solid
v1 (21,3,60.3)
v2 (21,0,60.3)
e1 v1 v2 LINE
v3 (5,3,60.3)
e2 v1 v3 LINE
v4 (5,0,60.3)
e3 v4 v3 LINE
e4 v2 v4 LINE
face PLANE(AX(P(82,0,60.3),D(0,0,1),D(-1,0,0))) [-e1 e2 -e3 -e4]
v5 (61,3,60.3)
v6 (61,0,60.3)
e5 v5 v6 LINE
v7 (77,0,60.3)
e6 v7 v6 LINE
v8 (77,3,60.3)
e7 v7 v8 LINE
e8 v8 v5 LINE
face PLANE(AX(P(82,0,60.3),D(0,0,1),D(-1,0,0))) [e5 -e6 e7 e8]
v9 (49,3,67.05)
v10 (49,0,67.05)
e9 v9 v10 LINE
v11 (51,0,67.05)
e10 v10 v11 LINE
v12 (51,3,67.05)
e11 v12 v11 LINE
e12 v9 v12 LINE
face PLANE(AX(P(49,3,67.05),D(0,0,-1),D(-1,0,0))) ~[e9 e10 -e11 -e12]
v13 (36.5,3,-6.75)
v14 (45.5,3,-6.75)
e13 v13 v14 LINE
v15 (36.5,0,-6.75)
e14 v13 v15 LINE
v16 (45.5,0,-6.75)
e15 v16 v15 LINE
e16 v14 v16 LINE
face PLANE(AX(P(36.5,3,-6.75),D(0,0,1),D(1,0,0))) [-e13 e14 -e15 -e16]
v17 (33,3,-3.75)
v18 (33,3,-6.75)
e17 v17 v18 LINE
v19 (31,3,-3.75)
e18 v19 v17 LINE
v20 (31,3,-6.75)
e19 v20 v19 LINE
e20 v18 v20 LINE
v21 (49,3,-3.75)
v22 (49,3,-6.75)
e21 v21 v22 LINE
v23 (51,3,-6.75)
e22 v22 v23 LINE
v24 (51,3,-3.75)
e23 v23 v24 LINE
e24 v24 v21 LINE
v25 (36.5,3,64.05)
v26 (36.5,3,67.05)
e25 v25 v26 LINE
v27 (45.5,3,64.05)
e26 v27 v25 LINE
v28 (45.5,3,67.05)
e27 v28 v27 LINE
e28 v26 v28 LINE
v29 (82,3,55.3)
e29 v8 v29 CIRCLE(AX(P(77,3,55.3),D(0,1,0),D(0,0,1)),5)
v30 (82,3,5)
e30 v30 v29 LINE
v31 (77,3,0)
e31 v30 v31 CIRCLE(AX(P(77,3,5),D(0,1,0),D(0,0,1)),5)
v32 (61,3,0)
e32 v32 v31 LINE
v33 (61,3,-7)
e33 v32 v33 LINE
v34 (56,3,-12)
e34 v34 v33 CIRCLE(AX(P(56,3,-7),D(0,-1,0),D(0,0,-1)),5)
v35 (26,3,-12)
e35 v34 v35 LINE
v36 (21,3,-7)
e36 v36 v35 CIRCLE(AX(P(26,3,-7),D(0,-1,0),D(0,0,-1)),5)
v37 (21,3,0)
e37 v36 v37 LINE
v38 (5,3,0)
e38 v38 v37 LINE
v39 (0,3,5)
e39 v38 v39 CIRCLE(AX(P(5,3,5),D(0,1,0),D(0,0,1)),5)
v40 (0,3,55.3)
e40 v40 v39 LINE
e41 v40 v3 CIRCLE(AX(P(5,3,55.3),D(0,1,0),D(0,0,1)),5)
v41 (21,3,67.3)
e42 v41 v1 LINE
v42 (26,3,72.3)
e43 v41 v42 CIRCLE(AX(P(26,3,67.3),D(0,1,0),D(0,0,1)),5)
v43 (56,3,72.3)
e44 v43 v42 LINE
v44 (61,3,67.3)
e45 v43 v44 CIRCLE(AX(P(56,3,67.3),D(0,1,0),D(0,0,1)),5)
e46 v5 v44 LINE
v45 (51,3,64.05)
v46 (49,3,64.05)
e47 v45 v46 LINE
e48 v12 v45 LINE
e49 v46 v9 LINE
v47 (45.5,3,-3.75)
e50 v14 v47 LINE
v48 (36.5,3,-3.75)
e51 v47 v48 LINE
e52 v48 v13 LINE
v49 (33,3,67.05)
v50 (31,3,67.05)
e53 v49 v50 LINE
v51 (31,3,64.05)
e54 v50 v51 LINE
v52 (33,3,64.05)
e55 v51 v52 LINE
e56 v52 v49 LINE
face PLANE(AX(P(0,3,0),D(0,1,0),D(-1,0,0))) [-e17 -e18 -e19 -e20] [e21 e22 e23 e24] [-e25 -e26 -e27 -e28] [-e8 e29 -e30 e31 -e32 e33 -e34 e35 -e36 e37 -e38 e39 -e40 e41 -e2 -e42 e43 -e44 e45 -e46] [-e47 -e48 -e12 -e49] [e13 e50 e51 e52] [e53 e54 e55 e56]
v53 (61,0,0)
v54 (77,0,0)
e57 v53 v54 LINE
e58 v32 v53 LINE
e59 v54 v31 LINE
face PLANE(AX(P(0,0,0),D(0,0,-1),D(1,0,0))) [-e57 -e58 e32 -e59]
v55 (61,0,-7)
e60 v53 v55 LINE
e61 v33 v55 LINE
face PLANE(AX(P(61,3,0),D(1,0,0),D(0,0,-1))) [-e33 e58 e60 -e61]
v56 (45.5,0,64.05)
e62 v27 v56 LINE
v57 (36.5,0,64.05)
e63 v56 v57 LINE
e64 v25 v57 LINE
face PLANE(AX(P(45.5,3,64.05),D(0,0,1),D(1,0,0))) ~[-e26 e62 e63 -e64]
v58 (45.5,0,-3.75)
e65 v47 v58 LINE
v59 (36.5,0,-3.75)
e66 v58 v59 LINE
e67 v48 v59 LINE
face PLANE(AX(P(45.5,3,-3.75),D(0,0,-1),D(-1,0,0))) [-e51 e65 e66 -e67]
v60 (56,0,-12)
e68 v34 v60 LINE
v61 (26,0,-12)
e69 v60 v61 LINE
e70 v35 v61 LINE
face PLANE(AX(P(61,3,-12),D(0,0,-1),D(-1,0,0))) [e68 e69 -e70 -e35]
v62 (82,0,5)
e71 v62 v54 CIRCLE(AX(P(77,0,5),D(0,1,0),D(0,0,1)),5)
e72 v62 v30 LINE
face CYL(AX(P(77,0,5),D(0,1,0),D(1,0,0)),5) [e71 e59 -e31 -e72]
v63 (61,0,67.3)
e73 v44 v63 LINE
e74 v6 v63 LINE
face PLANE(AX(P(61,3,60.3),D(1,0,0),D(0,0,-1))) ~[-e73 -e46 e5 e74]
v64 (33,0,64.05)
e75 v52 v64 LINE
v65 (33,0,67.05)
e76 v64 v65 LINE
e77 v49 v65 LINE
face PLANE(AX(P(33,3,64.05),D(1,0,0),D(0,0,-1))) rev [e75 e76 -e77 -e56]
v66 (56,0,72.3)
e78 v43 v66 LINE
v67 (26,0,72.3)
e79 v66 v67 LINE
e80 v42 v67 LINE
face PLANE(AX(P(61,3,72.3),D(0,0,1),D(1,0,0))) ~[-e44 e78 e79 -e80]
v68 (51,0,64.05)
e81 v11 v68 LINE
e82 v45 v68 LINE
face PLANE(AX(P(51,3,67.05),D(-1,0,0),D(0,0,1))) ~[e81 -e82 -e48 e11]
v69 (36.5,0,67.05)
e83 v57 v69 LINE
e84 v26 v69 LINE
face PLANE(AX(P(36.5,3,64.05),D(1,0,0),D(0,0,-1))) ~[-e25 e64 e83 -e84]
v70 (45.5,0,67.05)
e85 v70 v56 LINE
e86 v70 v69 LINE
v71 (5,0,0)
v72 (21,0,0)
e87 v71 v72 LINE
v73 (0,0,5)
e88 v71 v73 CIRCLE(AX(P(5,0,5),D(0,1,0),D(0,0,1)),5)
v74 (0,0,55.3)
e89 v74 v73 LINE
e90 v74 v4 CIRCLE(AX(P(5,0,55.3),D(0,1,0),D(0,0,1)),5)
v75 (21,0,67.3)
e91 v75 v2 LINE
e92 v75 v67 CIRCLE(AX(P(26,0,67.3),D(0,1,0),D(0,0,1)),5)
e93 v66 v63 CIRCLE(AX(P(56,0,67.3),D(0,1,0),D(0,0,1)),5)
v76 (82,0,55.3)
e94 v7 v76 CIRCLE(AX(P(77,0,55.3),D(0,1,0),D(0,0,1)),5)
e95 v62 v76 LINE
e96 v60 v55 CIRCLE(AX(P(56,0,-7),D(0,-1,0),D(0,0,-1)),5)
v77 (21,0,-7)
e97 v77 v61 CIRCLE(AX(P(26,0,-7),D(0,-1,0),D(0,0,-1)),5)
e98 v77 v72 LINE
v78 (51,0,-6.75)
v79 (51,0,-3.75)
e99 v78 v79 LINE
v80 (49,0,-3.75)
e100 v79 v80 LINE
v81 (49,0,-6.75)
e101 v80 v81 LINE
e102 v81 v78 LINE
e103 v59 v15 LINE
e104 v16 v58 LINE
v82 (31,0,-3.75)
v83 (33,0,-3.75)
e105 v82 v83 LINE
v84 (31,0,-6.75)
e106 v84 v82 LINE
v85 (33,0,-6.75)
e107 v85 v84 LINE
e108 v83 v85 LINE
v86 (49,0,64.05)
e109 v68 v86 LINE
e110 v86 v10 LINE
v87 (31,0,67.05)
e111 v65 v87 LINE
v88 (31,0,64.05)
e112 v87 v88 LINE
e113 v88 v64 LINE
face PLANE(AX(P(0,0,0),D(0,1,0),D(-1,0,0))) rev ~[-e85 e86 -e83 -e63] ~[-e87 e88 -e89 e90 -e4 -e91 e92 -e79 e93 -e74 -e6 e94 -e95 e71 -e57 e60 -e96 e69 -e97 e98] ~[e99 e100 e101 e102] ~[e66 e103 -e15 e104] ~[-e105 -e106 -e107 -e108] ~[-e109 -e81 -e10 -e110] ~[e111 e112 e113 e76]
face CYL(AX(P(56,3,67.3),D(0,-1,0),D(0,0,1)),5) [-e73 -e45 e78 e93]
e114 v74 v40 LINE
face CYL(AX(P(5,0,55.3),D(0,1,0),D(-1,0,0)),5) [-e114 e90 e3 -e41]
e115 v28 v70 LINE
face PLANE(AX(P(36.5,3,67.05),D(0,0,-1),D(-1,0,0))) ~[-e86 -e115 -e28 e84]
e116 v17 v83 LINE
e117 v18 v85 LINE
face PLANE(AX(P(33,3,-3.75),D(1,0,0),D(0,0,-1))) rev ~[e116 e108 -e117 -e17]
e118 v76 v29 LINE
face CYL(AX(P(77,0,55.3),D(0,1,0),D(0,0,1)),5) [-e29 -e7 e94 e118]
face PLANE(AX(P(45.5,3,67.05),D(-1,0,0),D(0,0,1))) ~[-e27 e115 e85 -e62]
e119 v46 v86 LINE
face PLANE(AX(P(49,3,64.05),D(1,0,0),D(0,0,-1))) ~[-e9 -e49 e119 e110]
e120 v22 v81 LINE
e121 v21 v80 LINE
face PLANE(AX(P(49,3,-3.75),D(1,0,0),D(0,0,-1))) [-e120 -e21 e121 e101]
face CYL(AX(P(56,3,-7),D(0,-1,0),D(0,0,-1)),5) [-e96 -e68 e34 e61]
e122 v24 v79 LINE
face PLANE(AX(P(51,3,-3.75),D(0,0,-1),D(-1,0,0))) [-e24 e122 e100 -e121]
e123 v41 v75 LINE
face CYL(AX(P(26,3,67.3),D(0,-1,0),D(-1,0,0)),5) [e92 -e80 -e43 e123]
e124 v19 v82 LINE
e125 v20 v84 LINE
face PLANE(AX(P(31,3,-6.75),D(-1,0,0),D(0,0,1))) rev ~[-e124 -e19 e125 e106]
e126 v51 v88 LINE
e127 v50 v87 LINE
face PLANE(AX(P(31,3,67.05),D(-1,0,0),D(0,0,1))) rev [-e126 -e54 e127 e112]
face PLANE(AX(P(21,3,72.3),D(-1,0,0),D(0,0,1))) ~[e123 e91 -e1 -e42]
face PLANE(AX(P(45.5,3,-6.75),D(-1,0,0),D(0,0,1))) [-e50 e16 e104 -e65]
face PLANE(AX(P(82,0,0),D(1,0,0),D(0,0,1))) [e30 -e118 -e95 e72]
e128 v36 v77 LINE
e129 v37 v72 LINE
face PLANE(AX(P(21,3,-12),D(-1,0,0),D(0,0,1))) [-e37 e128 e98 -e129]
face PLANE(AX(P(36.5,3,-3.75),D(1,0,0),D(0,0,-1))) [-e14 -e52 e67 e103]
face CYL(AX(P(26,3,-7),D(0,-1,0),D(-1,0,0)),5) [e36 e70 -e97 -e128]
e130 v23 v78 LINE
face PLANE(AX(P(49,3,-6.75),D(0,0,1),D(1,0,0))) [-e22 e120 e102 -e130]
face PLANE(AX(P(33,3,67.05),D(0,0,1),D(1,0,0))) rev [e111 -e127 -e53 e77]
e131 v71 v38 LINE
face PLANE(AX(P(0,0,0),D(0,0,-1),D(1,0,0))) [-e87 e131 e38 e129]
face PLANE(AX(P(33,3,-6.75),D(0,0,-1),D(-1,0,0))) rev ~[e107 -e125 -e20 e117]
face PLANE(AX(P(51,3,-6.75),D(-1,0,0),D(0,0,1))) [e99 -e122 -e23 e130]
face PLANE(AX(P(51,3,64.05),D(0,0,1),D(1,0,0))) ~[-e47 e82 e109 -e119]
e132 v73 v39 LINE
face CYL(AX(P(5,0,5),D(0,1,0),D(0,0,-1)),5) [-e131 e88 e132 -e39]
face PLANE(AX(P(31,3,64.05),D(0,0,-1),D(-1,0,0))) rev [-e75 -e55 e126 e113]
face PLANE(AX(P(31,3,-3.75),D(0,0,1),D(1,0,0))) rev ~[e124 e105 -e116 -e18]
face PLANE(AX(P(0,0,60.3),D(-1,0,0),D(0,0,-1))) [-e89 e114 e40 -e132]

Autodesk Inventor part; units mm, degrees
ref_plane "YZ Plane" through (0, 0, 0) normal (1, 0, 0) x (0, 1, 0)
ref_plane "XZ Plane" through (0, 0, 0) normal (0, 1, 0) x (-1, 0, 0)
sketch "Sketch1" plane through (0, 0, 0) normal (0, 1, 0) x (-1, 0, 0)
  line L0 (0, 0) -> (-82, 0)
  line L1 (-82, 0) -> (-82, 60.3)
  line L2 (-82, 60.3) -> (0, 60.3)
  line L3 (0, 60.3) -> (0, 0)
  dimension "d0" = 82
  dimension "d1" = 60.3
extrude "Extrusion1" add sketch "Sketch1" along normal blind 3
sketch "Sketch3" plane through (0, 3, 0) normal (0, 1, 0) x (1, 0, 0)
  line L0 (82, -60.3) -> (82, 0) projected
  line L1 (82, 0) -> (0, 0) projected
  line L2 (21, 0) -> (61, 0)
  line L3 (61, 0) -> (61, 12)
  line L4 (61, 12) -> (21, 12)
  line L5 (21, 12) -> (21, 0)
  dimension "d22" = 82
  dimension "d23" = 12
  dimension "d24" = 21
  dimension "d25" = 40
extrude "Extrusion3" add sketch "Sketch3" against normal blind 3
sketch "Sketch4" plane through (0, 3, 0) normal (0, 1, 0) x (1, 0, 0)
  line L0 (82, 0) -> (61, 0) projected
  line L1 (61, 0) -> (61, 12) projected
  line L2 (36.5, 6.75) -> (45.5, 6.75)
  line L3 (45.5, 6.75) -> (45.5, 3.75)
  line L4 (45.5, 3.75) -> (36.5, 3.75)
  line L5 (36.5, 3.75) -> (36.5, 6.75)
  line L6 (38, 6.75) -> (43, 6.75)
  line L7 (49, 6.75) -> (51, 6.75)
  line L8 (51, 6.75) -> (51, 3.75)
  line L9 (51, 3.75) -> (49, 3.75)
  line L10 (49, 3.75) -> (49, 6.75)
  line L11 (41, 6.75) -> (41, 3.75) construction
  line L12 (33, 6.75) -> (31, 6.75)
  line L13 (31, 6.75) -> (31, 3.75)
  line L14 (31, 3.75) -> (33, 3.75)
  line L15 (33, 3.75) -> (33, 6.75)
  point P0 (21, 12)
  dimension "d28" = 9
  dimension "d29" = 3
  dimension "d30" = 3.75
  dimension "d31" = 40
  dimension "d32" = 15.5
  dimension "d42" = 2
  dimension "d43" = 3
  dimension "d44" = 3.5
extrude "Extrusion4" cut sketch "Sketch4" against normal blind 3
fillet "Fillet1" radius 5 6 edges at (0, 1.5, 60.3) (82, 1.5, 60.3) (82, 1.5, 0) (61, 1.5, -12) (21, 1.5, -12) (0, 1.5, 0)
ref_plane "Work Plane1" through (5, 0, 30.15) normal (0, 0, 1) x (1, 0, 0)
mirror "Mirror1" about plane through (5, 0, 30.15) normal (0, 0, 1) of "Extrusion3", "Extrusion4"
mirror "Mirror2" about plane through (5, 0, 30.15) normal (0, 0, 1) of "Fillet1"
equation "\"d24\" = -0.5 * d25 + 0.5 * d22"
equation "\"d32\" = -0.5 * d28 + 0.5 * d31"
properties part number "base protopress" material "Glass"
